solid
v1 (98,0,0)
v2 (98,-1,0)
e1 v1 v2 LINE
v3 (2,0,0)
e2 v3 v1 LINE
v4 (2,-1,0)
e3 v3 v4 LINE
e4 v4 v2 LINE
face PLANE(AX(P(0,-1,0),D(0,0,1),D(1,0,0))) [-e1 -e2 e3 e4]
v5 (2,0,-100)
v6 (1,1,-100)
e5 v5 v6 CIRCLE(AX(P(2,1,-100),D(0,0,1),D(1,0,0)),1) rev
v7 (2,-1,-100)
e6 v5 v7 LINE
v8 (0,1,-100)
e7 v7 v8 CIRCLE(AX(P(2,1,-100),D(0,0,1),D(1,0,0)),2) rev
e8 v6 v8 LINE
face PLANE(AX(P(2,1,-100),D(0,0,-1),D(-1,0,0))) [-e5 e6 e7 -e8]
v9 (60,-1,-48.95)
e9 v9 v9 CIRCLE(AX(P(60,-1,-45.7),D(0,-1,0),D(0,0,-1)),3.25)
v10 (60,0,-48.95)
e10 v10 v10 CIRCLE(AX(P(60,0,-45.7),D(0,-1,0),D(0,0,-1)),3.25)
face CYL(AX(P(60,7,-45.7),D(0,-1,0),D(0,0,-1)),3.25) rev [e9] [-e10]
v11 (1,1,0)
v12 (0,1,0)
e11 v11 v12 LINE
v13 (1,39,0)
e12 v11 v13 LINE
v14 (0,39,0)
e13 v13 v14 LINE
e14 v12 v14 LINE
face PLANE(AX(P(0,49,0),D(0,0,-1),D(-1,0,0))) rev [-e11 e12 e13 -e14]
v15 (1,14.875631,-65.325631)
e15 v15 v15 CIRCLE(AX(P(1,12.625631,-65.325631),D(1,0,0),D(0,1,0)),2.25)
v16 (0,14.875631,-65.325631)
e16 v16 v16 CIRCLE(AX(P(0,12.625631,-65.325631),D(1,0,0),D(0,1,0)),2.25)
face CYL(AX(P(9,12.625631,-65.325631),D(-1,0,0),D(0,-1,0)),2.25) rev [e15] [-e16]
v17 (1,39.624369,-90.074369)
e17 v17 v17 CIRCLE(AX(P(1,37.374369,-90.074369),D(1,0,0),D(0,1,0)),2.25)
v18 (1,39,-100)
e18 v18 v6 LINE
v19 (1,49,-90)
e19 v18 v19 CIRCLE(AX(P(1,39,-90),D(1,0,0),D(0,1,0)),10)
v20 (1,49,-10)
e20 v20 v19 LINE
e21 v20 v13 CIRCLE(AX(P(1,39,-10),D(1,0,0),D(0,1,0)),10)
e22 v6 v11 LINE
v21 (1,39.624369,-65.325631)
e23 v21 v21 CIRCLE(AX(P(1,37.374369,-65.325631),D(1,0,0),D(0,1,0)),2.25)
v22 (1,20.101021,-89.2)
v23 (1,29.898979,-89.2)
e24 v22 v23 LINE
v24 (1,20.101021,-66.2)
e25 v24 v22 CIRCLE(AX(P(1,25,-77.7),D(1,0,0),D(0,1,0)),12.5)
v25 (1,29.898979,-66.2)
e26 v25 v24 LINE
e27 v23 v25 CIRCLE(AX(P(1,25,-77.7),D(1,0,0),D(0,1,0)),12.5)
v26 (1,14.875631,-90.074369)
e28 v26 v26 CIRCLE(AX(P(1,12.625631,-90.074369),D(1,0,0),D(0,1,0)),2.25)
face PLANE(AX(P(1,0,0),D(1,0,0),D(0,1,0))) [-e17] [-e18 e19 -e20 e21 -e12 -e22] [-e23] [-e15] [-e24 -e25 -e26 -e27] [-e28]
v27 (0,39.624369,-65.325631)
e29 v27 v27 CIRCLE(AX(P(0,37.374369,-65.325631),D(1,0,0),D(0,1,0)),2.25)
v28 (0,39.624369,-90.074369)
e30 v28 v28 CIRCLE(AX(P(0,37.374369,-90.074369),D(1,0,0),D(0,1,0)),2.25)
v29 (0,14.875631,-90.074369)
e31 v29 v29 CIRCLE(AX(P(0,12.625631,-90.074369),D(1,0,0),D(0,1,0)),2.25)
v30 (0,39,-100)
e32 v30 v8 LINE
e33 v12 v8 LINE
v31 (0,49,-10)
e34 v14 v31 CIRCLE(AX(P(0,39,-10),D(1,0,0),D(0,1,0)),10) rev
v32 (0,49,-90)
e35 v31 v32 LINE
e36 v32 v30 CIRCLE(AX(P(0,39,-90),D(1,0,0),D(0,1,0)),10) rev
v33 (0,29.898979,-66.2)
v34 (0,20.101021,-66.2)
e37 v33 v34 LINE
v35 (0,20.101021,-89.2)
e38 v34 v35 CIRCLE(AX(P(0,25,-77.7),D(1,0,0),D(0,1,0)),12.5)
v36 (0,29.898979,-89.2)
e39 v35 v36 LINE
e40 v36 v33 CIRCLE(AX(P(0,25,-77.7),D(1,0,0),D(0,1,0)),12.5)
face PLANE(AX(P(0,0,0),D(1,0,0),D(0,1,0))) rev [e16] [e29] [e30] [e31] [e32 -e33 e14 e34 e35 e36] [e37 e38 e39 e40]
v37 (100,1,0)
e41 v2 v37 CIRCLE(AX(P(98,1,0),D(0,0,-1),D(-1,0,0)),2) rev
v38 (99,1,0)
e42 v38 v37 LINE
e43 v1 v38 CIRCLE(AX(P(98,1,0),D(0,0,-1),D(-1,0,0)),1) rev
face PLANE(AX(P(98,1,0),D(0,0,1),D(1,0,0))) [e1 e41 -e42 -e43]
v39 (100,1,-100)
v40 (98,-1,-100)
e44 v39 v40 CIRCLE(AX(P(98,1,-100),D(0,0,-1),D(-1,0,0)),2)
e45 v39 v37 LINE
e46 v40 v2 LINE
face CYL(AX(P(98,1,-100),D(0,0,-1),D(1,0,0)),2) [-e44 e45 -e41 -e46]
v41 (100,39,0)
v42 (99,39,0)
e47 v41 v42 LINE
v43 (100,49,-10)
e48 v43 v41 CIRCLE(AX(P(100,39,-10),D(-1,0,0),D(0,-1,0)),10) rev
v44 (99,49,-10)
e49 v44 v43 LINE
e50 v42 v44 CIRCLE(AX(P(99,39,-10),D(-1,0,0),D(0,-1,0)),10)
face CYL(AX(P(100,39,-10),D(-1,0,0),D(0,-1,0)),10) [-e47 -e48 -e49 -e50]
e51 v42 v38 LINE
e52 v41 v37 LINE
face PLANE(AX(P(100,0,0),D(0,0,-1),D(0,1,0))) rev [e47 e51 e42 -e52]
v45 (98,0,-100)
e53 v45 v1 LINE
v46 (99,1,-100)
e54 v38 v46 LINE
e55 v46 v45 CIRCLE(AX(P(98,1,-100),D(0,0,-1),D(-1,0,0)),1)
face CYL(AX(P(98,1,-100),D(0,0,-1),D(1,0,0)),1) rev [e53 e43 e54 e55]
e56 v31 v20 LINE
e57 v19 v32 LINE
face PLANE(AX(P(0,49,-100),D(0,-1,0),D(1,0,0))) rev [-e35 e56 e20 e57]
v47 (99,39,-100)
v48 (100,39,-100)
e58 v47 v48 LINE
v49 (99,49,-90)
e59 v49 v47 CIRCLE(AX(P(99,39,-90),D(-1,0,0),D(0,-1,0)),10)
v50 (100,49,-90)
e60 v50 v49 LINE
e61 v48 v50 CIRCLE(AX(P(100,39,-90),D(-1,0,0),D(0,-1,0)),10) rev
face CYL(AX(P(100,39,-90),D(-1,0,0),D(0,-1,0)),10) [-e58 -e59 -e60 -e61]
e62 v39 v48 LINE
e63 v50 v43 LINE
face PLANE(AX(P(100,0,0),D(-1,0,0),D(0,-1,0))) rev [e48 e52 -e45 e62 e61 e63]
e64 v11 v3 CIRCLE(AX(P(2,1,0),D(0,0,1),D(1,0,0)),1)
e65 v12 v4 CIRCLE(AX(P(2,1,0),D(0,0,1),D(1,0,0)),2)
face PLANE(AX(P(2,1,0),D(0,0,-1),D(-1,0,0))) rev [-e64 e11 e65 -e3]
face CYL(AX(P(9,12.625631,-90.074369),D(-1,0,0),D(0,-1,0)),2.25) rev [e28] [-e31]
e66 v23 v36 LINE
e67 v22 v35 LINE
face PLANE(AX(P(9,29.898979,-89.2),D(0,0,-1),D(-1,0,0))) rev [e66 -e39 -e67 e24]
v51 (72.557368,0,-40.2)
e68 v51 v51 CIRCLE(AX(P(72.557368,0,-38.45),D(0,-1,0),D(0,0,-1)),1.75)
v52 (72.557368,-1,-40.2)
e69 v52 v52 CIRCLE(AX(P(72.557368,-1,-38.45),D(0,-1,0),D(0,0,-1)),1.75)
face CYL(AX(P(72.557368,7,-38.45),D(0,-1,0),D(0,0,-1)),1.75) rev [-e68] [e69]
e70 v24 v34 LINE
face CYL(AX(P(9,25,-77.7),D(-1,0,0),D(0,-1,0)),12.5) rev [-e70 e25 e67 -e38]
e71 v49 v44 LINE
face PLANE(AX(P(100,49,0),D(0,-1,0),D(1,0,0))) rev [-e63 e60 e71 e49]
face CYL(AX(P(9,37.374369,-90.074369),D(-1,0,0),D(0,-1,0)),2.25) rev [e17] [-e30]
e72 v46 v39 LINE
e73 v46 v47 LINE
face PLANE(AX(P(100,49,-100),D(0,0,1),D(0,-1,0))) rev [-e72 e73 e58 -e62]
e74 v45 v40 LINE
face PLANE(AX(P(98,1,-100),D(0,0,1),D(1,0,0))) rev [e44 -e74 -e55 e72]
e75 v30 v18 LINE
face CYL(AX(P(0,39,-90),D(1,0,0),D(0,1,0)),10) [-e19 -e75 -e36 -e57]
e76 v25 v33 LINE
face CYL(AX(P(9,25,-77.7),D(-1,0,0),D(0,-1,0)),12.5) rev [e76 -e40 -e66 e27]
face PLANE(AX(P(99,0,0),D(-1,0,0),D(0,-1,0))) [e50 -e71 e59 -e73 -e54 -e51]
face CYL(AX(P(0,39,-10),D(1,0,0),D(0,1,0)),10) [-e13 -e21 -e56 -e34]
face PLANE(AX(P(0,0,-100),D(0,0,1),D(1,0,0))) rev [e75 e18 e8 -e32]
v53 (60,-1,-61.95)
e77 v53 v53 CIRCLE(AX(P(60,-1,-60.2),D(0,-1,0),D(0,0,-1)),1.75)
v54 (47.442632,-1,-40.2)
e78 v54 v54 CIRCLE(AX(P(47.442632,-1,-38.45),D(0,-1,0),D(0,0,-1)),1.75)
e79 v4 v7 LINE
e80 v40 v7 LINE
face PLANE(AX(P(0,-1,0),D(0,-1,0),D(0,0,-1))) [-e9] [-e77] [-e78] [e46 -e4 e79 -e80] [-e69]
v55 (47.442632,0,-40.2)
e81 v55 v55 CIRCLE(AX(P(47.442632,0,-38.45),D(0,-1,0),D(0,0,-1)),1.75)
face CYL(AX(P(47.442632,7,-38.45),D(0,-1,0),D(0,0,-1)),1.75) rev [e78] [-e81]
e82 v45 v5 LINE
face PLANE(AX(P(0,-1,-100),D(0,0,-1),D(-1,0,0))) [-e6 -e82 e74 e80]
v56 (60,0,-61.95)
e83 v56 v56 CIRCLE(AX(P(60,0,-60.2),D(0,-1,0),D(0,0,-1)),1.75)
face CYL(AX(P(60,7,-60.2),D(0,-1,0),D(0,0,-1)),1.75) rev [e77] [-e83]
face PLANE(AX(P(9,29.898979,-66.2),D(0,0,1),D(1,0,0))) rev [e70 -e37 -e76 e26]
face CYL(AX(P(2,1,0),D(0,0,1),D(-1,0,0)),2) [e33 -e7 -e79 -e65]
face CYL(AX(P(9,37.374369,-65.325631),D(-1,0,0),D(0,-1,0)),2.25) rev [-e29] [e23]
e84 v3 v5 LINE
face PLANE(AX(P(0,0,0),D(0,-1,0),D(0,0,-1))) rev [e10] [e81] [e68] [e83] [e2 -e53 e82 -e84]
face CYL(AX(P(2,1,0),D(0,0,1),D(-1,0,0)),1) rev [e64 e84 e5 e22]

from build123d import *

# Parameters (mm, degrees)
SKETCH1_W                    = 100
SKETCH1_H                    = 100
BASE_FLANGE1_DEPTH           = 1
EDGE_FLANGE1_STRIP_W         = 6
EDGE_FLANGE1_STRIP_H         = 1
EDGE_FLANGE1_STRIP_CUT_DEPTH = 100
EDGE_FLANGE1_DEPTH           = 100
EDGE_FLANGE2_STRIP_W         = 6
EDGE_FLANGE2_STRIP_H         = 1
EDGE_FLANGE2_STRIP_CUT_DEPTH = 100
EDGE_FLANGE2_DEPTH           = 100
FILLET1_R                    = 10
SKETCH12_R                   = 2.25
CUT_EXTRUDE1_DEPTH           = 10
SKETCH13_R                   = 3.25
SKETCH13_R_2                 = 1.75
CUT_EXTRUDE2_DEPTH           = 8


# Sheet-metal steps are written as plain solids
with BuildPart() as part:
    # Sketch1 → Base-Flange1 (new body)
    with BuildSketch(Plane(origin=(0, 0, 0), x_dir=(1, 0, 0), z_dir=(0, 1, 0))):
        with Locations((50, 50)):
            Rectangle(SKETCH1_W, SKETCH1_H)
    extrude(amount=-BASE_FLANGE1_DEPTH)

    # Edge-Flange1 strip (across the edge) → Edge-Flange1 strip cut (cut)
    with BuildSketch(Plane(origin=(100, 0, 0), x_dir=(-1, 0, 0), z_dir=(0, 0, -1))):
        with Locations((-1, -0.5)):
            Rectangle(EDGE_FLANGE1_STRIP_W, EDGE_FLANGE1_STRIP_H)
    extrude(amount=EDGE_FLANGE1_STRIP_CUT_DEPTH, mode=Mode.SUBTRACT)

    # Edge-Flange1 section (across the edge) → Edge-Flange1 (add)
    with BuildSketch(Plane(origin=(100, 0, 0), x_dir=(-1, 0, 0), z_dir=(0, 0, -1))):
        with BuildLine():
            Line((0, 1), (0, 49))
            Line((0, 49), (1, 49))
            Line((1, 49), (1, 1))
            ThreePointArc((1, 1), (1.292893219, 0.292893219), (2, 0))
            Line((2, 0), (2, -1))
            ThreePointArc((2, -1), (0.585786438, -0.414213562), (0, 1))
        make_face()
    extrude(amount=EDGE_FLANGE1_DEPTH)

    # Edge-Flange2 strip (across the edge) → Edge-Flange2 strip cut (cut)
    with BuildSketch(Plane.XY.offset(-100)):
        with Locations((-1, -0.5)):
            Rectangle(EDGE_FLANGE2_STRIP_W, EDGE_FLANGE2_STRIP_H)
    extrude(amount=EDGE_FLANGE2_STRIP_CUT_DEPTH, mode=Mode.SUBTRACT)

    # Edge-Flange2 section (across the edge) → Edge-Flange2 (add)
    with BuildSketch(Plane.XY.offset(-100)):
        with BuildLine():
            Line((0, 1), (0, 49))
            Line((0, 49), (1, 49))
            Line((1, 49), (1, 1))
            ThreePointArc((1, 1), (1.292893219, 0.292893219), (2, 0))
            Line((2, 0), (2, -1))
            ThreePointArc((2, -1), (0.585786438, -0.414213562), (0, 1))
        make_face()
    extrude(amount=EDGE_FLANGE2_DEPTH)

    # Fillet1
    fillet1_edges = [part.edges().sort_by_distance(p)[0] for p in [
        (99.5, 49, 0),
        (99.5, 49, -100),
        (0.5, 49, -100),
        (0.5, 49, 0),
    ]]
    fillet(fillet1_edges, radius=FILLET1_R)

    # Sketch12 → Cut-Extrude1 (cut)
    with BuildSketch(Plane(origin=(-1, -31.373526732, -102.532454166), x_dir=(0, 0, 1), z_dir=(-1, 0, 0))):
        with BuildLine():
            ThreePointArc((36.332454166, 61.272506218), (24.832454166, 68.873526732), (13.332454166, 61.272506218))
            Line((13.332454166, 61.272506218), (13.332454166, 51.474547246))
            ThreePointArc((13.332454166, 51.474547246), (24.832454166, 43.873526732), (36.332454166, 51.474547246))
            Line((36.332454166, 51.474547246), (36.332454166, 61.272506218))
        make_face()
        with Locations(Location((12.458085495, 68.747895403, 0), (0, 0, 90))):
            Circle(SKETCH12_R)
        with Locations(Location((37.206822836, 68.747895403, 0), (0, 0, 90))):
            Circle(SKETCH12_R)
        with Locations(Location((37.206822836, 43.999158061, 0), (0, 0, 90))):
            Circle(SKETCH12_R)
        with Locations(Location((12.458085495, 43.999158061, 0), (0, 0, 90))):
            Circle(SKETCH12_R)
    extrude(amount=-CUT_EXTRUDE1_DEPTH, mode=Mode.SUBTRACT)

    # Sketch13 → Cut-Extrude2 (cut)
    with BuildSketch(Plane(origin=(17.313345769, -1, -102.532454166), x_dir=(1, 0, 0), z_dir=(0, -1, 0))):
        with Locations(Location((42.686654231, 56.832454166, 0), (0, 0, 270))):
            Circle(SKETCH13_R)
        with Locations(Location((30.129285876, 64.082454166, 0), (0, 0, 270))):
            Circle(SKETCH13_R_2)
        with Locations(Location((55.244022586, 64.082454166, 0), (0, 0, 270))):
            Circle(SKETCH13_R_2)
        with Locations(Location((42.686654231, 42.332454166, 0), (0, 0, 270))):
            Circle(SKETCH13_R_2)
    extrude(amount=-CUT_EXTRUDE2_DEPTH, mode=Mode.SUBTRACT)


solid = part.part
